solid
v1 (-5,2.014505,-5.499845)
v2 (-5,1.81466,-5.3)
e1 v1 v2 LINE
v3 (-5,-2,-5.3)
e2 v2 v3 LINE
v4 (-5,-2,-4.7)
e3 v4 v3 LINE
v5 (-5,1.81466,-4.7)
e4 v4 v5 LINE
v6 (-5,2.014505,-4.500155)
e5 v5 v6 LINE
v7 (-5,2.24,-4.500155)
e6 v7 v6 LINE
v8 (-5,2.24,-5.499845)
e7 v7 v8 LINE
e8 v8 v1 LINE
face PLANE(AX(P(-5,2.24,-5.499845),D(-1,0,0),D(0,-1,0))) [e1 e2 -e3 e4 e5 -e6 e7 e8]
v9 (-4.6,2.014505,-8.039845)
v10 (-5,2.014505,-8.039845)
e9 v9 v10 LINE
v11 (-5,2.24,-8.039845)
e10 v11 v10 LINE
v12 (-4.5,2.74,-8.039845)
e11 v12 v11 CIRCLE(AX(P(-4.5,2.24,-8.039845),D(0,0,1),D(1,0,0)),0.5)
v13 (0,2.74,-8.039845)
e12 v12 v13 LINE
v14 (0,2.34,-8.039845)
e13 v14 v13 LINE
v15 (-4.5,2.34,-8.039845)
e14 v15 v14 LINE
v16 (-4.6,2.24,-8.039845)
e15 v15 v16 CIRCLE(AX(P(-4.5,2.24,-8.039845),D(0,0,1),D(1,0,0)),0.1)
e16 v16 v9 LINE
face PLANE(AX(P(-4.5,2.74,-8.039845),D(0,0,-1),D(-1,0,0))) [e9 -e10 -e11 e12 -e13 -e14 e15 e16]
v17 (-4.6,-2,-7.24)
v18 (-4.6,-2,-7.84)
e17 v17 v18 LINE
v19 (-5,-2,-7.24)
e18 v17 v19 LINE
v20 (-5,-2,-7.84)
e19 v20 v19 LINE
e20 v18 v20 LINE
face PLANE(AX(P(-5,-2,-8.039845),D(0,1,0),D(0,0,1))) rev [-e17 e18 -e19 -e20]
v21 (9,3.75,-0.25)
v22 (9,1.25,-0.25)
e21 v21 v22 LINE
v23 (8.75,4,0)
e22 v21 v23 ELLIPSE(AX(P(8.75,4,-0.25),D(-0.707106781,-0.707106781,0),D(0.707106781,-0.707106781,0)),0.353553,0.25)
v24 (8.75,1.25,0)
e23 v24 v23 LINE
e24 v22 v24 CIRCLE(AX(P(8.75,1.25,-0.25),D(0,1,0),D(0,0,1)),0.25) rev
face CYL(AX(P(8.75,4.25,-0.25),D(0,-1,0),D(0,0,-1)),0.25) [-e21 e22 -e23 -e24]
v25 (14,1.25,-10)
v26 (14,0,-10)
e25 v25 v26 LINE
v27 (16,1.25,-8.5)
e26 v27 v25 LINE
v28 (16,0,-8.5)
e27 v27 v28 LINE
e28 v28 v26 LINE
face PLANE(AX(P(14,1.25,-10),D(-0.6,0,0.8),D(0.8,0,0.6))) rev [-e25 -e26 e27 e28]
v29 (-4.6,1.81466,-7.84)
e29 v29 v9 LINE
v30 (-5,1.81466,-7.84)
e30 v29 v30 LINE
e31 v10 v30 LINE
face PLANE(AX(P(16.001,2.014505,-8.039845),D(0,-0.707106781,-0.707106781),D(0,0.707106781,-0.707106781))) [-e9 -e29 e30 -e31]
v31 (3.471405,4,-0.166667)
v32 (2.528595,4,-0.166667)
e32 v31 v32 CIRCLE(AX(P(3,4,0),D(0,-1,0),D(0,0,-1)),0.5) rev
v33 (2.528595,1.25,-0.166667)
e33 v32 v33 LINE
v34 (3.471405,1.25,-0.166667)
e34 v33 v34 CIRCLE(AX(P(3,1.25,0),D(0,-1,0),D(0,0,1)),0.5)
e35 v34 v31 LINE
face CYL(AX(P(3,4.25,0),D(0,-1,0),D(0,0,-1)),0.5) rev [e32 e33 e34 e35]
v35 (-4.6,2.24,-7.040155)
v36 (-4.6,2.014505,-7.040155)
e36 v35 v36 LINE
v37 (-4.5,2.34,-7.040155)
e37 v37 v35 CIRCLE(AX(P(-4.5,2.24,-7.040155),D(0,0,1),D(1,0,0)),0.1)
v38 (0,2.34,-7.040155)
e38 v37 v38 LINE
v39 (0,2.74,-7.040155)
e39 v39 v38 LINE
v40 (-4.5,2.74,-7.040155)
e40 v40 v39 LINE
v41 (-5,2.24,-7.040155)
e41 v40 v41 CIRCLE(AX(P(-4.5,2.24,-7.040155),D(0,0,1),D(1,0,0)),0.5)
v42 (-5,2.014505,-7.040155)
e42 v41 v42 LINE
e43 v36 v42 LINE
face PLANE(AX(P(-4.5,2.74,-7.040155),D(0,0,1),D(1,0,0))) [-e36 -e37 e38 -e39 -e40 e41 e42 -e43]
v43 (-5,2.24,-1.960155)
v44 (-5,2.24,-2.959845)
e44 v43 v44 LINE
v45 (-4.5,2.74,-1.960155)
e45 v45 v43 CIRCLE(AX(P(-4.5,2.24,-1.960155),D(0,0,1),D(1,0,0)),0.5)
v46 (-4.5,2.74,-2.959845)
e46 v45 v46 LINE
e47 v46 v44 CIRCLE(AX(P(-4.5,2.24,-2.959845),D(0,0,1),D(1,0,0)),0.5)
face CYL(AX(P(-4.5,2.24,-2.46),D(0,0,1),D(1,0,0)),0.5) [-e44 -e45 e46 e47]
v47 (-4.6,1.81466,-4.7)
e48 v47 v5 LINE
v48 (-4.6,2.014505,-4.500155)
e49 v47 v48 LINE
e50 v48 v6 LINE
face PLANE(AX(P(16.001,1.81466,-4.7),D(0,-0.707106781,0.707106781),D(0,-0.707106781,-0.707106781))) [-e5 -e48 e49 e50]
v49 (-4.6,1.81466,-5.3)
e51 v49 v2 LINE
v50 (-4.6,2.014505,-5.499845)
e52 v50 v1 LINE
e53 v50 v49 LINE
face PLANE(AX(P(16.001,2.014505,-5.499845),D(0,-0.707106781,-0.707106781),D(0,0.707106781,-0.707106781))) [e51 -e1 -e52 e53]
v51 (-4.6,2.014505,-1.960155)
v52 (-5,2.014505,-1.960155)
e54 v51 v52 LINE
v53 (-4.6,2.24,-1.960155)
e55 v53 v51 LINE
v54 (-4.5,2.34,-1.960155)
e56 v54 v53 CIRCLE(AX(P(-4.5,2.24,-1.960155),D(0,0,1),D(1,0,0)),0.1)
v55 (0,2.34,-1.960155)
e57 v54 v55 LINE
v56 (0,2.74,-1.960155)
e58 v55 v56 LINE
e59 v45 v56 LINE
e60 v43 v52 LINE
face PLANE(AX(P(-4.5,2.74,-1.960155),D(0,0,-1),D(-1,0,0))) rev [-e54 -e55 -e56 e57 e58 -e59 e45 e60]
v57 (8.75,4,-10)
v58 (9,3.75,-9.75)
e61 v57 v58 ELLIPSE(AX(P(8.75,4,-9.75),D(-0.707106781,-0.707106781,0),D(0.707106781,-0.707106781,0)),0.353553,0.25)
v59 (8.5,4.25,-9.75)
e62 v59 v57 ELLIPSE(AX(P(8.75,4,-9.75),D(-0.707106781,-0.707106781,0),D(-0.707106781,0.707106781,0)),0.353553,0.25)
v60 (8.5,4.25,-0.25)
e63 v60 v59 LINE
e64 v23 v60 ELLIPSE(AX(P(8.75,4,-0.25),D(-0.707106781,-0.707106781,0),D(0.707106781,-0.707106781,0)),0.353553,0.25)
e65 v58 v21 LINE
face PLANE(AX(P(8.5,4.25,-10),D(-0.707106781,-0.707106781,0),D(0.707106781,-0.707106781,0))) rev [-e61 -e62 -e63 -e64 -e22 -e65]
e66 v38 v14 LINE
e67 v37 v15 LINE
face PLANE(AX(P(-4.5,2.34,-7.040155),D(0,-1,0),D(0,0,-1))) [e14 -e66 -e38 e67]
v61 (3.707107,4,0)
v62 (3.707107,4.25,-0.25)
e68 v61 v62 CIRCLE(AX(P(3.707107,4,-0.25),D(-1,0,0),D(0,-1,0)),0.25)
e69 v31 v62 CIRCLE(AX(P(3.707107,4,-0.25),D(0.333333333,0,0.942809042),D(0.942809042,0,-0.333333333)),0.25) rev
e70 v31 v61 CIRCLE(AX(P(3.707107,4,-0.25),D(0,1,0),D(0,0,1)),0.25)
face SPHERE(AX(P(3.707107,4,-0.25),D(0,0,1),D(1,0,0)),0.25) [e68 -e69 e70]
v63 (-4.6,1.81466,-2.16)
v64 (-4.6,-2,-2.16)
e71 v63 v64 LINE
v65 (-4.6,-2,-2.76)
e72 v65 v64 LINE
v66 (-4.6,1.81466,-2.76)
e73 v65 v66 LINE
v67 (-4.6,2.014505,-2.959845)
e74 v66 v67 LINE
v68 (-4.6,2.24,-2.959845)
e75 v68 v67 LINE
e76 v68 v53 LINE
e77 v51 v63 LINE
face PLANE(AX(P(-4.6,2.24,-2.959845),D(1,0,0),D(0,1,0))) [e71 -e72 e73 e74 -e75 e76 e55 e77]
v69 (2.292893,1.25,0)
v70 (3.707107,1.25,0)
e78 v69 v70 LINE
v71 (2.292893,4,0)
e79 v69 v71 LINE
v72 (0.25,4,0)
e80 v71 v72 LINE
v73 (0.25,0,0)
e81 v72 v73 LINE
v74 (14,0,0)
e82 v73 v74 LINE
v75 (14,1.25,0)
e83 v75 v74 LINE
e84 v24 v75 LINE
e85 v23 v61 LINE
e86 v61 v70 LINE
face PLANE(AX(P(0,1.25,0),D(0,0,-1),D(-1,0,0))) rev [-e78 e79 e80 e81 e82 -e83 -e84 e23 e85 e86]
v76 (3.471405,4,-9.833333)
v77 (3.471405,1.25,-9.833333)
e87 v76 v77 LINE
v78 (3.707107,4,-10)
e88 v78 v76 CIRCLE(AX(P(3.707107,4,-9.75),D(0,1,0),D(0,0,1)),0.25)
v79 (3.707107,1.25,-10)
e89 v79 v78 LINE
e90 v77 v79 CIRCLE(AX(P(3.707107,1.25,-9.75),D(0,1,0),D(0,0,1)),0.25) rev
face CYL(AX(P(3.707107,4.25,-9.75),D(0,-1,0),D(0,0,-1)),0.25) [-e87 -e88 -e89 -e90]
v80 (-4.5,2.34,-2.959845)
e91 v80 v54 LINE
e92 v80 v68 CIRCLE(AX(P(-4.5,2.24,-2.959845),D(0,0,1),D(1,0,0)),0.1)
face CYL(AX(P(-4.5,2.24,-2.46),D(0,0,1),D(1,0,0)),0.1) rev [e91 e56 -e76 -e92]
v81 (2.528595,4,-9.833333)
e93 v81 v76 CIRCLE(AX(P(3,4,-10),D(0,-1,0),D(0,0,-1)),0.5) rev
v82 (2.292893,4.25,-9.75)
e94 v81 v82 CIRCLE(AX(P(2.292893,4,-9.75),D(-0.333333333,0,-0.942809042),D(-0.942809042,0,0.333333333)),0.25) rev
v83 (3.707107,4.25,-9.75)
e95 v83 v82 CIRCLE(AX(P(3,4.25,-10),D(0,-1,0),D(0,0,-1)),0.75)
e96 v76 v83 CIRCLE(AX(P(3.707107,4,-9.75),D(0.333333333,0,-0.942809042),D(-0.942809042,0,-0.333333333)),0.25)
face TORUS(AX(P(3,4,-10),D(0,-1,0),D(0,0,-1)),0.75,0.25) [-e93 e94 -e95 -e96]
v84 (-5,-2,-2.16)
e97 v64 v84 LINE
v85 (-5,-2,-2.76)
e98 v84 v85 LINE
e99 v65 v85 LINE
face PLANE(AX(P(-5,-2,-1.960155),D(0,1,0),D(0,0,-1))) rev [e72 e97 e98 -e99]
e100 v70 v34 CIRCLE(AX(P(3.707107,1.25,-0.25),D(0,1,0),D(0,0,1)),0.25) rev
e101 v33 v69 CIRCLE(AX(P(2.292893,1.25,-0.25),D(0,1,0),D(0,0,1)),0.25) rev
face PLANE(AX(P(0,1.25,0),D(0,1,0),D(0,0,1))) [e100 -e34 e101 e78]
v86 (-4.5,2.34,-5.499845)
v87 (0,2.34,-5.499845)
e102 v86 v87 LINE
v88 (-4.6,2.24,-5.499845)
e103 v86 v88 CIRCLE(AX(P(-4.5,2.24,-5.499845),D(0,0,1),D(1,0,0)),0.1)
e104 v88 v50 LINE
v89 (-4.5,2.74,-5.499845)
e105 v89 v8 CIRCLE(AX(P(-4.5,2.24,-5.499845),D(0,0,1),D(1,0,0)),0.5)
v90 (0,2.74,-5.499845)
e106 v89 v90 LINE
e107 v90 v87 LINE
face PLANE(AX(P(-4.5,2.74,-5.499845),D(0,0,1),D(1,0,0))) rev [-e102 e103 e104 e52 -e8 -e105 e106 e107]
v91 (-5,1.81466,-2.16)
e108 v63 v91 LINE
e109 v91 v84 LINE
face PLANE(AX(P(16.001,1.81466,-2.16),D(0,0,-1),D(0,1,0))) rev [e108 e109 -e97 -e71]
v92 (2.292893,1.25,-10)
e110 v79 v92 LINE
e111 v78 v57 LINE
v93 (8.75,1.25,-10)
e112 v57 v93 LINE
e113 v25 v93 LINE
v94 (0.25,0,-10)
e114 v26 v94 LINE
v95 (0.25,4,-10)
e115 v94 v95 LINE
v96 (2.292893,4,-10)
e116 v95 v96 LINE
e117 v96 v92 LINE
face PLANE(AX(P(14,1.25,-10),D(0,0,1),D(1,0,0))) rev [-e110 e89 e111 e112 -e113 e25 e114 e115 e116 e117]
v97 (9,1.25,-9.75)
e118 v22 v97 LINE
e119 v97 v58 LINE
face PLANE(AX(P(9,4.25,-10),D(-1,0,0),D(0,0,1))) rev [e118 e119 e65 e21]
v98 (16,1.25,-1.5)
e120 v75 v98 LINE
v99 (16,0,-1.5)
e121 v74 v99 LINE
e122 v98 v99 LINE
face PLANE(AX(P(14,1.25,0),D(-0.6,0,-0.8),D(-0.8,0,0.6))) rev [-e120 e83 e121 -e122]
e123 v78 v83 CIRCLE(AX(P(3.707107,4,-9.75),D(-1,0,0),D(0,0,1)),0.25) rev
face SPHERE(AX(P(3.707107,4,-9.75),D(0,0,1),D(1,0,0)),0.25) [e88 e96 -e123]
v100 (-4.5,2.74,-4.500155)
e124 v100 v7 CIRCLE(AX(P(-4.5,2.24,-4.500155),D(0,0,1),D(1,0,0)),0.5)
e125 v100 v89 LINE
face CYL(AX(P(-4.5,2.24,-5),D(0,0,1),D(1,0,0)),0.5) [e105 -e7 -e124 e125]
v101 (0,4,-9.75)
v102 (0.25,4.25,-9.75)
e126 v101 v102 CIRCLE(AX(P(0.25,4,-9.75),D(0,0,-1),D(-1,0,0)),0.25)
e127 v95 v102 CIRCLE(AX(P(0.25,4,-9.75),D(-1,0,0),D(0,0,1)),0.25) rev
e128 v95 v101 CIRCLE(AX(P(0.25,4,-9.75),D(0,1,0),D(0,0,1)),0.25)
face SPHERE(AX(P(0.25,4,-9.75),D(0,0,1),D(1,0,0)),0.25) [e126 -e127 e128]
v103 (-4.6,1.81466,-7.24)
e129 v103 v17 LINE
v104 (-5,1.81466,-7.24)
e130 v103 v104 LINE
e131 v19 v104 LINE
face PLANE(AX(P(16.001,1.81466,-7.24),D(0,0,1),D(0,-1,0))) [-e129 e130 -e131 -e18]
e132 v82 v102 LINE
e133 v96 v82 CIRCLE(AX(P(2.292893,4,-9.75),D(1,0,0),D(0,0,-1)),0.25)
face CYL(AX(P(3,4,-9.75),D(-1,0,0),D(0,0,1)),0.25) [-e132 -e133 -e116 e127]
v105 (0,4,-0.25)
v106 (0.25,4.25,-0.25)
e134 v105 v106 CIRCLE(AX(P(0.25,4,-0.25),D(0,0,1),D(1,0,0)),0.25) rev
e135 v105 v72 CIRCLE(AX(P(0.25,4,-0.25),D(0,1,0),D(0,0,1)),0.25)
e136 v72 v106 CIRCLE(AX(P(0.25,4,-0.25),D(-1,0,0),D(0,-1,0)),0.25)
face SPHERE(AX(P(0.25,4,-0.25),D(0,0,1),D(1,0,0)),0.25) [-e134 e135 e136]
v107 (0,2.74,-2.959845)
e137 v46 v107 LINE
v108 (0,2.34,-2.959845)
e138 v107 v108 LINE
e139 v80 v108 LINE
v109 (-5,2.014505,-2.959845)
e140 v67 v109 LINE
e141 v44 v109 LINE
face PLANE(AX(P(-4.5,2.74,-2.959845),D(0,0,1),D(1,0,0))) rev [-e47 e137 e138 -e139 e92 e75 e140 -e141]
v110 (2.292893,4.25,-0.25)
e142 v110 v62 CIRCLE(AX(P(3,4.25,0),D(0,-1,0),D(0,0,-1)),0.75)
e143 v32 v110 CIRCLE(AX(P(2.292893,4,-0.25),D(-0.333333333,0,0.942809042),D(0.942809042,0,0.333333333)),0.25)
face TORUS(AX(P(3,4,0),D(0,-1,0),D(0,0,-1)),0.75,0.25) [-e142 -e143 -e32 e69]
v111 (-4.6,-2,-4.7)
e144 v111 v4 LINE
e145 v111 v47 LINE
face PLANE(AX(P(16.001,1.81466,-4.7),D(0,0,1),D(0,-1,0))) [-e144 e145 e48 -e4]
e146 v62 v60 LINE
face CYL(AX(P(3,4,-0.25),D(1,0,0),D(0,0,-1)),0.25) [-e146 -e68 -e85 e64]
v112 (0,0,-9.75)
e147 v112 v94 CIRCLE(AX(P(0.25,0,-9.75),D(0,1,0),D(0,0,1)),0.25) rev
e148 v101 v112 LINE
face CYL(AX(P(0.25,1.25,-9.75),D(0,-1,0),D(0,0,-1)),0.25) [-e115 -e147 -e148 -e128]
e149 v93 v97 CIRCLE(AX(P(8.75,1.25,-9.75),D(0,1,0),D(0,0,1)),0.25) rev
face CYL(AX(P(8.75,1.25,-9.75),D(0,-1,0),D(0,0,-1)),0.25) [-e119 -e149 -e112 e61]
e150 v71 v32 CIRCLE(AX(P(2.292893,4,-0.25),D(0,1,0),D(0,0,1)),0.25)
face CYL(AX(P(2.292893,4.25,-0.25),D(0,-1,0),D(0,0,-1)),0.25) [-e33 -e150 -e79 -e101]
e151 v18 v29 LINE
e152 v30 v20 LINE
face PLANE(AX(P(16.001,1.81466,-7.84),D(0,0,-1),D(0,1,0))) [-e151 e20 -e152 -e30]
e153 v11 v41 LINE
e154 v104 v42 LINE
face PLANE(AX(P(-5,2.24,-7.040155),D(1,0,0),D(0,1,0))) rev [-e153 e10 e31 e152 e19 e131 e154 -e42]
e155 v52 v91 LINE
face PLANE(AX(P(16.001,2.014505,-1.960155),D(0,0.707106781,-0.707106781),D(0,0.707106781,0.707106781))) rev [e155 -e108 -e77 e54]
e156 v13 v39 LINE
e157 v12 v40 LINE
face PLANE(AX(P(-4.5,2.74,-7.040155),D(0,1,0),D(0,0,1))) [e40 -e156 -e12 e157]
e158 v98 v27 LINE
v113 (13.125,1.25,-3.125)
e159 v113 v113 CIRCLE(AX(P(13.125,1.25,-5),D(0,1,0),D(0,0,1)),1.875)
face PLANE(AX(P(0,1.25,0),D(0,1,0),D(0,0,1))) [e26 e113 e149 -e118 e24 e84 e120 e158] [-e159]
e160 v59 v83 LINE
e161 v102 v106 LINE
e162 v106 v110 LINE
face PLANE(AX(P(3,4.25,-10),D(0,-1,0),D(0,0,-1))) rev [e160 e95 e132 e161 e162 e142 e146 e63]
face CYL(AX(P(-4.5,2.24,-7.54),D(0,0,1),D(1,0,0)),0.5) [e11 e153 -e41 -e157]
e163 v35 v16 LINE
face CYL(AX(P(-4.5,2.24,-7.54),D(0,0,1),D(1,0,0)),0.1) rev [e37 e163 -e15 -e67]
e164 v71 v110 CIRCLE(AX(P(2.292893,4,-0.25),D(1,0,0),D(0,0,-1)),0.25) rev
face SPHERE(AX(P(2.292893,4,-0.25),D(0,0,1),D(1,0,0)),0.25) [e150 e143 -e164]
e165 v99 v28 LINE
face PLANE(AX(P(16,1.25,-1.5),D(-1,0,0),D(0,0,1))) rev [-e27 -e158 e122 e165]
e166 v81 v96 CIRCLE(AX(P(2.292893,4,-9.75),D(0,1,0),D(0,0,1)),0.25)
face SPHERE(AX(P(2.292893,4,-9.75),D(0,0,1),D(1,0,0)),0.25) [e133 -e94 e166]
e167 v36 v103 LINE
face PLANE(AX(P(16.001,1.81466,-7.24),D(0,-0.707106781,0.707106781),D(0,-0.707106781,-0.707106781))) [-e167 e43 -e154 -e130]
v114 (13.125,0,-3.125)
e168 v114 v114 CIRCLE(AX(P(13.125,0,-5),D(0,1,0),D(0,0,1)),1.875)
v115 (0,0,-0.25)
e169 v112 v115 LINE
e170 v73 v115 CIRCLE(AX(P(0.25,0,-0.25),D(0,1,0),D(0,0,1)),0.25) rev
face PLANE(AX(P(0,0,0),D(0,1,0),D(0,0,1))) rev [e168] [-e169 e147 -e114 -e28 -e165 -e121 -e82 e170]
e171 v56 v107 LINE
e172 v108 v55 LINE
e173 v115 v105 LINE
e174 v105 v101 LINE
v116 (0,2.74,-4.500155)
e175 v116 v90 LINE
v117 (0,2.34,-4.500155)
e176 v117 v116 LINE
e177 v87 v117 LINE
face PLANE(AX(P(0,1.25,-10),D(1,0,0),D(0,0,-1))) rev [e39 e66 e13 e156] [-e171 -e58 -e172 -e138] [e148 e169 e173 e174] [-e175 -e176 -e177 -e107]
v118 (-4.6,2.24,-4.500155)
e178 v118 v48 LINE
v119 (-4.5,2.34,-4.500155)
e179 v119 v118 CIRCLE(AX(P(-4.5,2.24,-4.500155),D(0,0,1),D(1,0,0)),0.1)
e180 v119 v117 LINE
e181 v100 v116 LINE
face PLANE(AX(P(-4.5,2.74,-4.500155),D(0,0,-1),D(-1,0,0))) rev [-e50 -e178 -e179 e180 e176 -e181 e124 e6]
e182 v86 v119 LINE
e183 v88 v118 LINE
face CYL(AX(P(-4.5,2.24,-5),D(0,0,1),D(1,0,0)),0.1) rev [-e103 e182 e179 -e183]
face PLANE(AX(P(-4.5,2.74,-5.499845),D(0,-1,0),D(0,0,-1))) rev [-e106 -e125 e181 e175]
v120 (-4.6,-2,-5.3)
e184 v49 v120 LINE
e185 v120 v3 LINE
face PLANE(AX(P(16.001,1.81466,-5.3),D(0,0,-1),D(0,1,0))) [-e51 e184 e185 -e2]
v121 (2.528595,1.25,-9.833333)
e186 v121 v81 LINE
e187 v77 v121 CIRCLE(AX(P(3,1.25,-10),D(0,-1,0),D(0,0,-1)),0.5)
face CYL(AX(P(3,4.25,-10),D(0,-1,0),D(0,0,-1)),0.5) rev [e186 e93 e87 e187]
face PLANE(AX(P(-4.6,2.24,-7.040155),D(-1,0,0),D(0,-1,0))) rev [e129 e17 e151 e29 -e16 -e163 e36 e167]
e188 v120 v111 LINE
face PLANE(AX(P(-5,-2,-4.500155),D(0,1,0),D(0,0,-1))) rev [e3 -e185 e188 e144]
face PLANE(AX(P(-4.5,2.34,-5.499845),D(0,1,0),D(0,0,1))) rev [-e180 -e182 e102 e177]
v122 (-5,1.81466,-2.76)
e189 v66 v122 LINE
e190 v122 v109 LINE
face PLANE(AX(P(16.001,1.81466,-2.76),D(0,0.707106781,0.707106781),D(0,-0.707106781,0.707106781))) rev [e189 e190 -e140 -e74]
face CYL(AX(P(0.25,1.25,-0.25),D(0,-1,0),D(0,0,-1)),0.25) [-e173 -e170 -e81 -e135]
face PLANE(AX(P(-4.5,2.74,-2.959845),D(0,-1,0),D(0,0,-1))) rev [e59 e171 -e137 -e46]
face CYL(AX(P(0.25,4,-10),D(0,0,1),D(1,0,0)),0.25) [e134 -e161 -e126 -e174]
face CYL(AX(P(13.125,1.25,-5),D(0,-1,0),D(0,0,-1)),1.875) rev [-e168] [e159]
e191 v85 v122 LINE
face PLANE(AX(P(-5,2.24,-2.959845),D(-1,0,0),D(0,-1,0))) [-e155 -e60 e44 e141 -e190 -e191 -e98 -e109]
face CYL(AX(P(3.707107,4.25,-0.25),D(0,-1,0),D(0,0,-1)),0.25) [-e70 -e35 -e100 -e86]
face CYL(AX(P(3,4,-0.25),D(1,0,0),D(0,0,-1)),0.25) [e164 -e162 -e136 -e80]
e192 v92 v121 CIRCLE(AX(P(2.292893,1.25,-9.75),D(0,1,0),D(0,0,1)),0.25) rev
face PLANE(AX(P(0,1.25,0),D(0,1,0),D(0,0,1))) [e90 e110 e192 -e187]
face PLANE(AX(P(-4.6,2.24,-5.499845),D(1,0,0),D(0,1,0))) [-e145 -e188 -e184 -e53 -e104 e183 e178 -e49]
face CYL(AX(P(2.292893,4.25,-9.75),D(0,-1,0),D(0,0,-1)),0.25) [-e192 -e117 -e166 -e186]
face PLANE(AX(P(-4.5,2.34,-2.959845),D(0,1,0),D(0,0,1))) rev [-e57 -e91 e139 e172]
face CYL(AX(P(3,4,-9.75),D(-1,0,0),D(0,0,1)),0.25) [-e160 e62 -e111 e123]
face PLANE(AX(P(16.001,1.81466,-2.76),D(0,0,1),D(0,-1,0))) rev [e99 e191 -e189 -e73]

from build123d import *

# Parameters (mm, degrees)
SKETCH_1_R               = 1.875
EXTRUDE_1_DEPTH          = 1.25
EXTRUDE_2_DEPTH          = 3
FILLET_1_R               = 0.25
CHAMFER_1_SIZE           = 0.5
SKETCH_3_W               = 0.999690432
SKETCH_3_H               = 0.4
CUT_EXTRUDE_1_REACH      = 25.645
PATTERN_LINEAR_1_COUNT   = 2
PATTERN_LINEAR_1_PITCH   = 2.54
MIRROR_1_COPY_1_SKETCH_W = 0.999690432
MIRROR_1_COPY_1_SKETCH_H = 0.4
MIRROR_1_COPY_2_REACH    = 25.645


with BuildPart() as part:
    # 草图1 → 凸台-拉伸1 (new body)
    with BuildSketch(Plane(origin=(0, 0, 0), x_dir=(1, 0, 0), z_dir=(0, 1, 0))):
        Polygon((0, 0), (14, 0), (16, 1.5), (16, 8.5), (14, 10), (0, 10), align=None)
        with Locations(Location((13.125, 5, 0), (0, 0, 270))):
            Circle(SKETCH_1_R, mode=Mode.SUBTRACT)
    extrude(amount=EXTRUDE_1_DEPTH)

    # 草图2 → 凸台-拉伸2 (add)
    with BuildSketch(Plane(origin=(0, 1.25, 0), x_dir=(1, 0, 0), z_dir=(0, 1, 0))):
        with BuildLine():
            Line((0, 10), (2.5, 10))
            ThreePointArc((2.5, 10), (3, 9.5), (3.5, 10))
            Line((3.5, 10), (9, 10))
            Line((9, 10), (9, 0))
            Line((9, 0), (3.5, 0))
            ThreePointArc((3.5, 0), (3, 0.5), (2.5, 0))
            Line((2.5, 0), (0, 0))
            Line((0, 0), (0, 10))
        make_face()
    extrude(amount=EXTRUDE_2_DEPTH)

    # 圆角1
    fillet_1_edges = [part.edges().sort_by_distance(p)[0] for p in [
        (0, 2.125, -10),
        (2.5, 2.75, -10),
        (3.5, 2.75, -10),
        (6.25, 4.25, -10),
        (3, 4.25, -9.5),
        (1.25, 4.25, -10),
        (0, 4.25, -5),
        (0, 2.125, 0),
        (3.5, 2.75, 0),
        (2.5, 2.75, 0),
        (1.25, 4.25, 0),
        (3, 4.25, -0.5),
        (6.25, 4.25, 0),
        (9, 2.75, -10),
        (9, 2.75, 0),
    ]]
    fillet(fillet_1_edges, radius=FILLET_1_R)

    # 倒角1
    # the kernel refuses this chamfer: 0.5 mm, written as the material it takes off along each edge
    with BuildSketch(Plane(origin=(9, 4.25, -11.035841494), x_dir=(-0.9996219169112968, 0.027495876610585647, 0), z_dir=(0, 0, 1))) as chamfer_1_piece_1:
        Polygon((CHAMFER_1_SIZE * 0.999621916911, CHAMFER_1_SIZE * 0.0274958766106), (-CHAMFER_1_SIZE * 0.0274958766106, CHAMFER_1_SIZE * 0.999621916911), (0, 0), align=None)
    extrude(amount=12.071682988, mode=Mode.SUBTRACT)

    # 扫描1: sweep along a path in 草图4
    with BuildLine(Plane(origin=(0, 0, -5), x_dir=(-1, 0, 0), z_dir=(0, 0, -1))) as sweep_1_path:
        Line((0, 2.74), (4.5, 2.74))
        ThreePointArc((4.5, 2.74), (4.853553391, 2.593553391), (5, 2.24))
        Line((5, 2.24), (5, -2))
    # 草图3 → 扫描1 (sweep)
    with BuildSketch(Plane.ZY):
        with Locations((-5, 2.54)):
            Rectangle(SKETCH_3_W, SKETCH_3_H)
    sweep_1 = sweep(path=sweep_1_path.line)

    # 草图5 → 切除-拉伸1 (cut, up to next)
    with BuildSketch(Plane.ZY.offset(5), mode=Mode.PRIVATE) as cut_extrude_1_sk1:
        Polygon((-4.7, 1.814659855), (-4.7, -2), (-4.500154784, -2), (-4.500154784, 2.014505072), align=None)
    cut_extrude_1_tool1 = extrude(cut_extrude_1_sk1.sketch, amount=-CUT_EXTRUDE_1_REACH, mode=Mode.PRIVATE) & part.part
    # 草图5 → 切除-拉伸1 (cut, up to next)
    with BuildSketch(Plane.ZY.offset(5), mode=Mode.PRIVATE) as cut_extrude_1_sk2:
        Polygon((-5.3, 1.814659855), (-5.3, -2), (-5.499845216, -2), (-5.499845216, 2.014505072), align=None)
    cut_extrude_1_tool2 = extrude(cut_extrude_1_sk2.sketch, amount=-CUT_EXTRUDE_1_REACH, mode=Mode.PRIVATE) & part.part
    cut_extrude_1_1 = cut_extrude_1_tool1.solids().sort_by_distance((-5, -0.042284, -4.599227))[0]
    add(cut_extrude_1_1, mode=Mode.SUBTRACT)
    cut_extrude_1_2 = cut_extrude_1_tool2.solids().sort_by_distance((-5, -0.042284, -5.400773))[0]
    add(cut_extrude_1_2, mode=Mode.SUBTRACT)
    cut_extrude_1 = cut_extrude_1_1 + cut_extrude_1_2  # 切除-拉伸1 as one shape, for the pattern or mirror that repeats it

    # 阵列(线性)1: 扫描1, 切除-拉伸1 ×2
    with Locations(*[(0, 0, i * PATTERN_LINEAR_1_PITCH) for i in range(1, PATTERN_LINEAR_1_COUNT)]):
        add(sweep_1)
        add(cut_extrude_1, mode=Mode.SUBTRACT)

    # 镜向1: 扫描1, 切除-拉伸1 across plane
    add(sweep_1.mirror(Plane(origin=(0, 0, -5), x_dir=(1, 0, 0), z_dir=(0, 0, -1))))
    add(cut_extrude_1.mirror(Plane(origin=(0, 0, -5), x_dir=(1, 0, 0), z_dir=(0, 0, -1))), mode=Mode.SUBTRACT)

    # 镜向1 copy 1: sweep along a path in 镜向1 copy 1 path
    with BuildLine(Plane(origin=(0, 0, -7.54), x_dir=(-1, 0, 0), z_dir=(0, 0, 1))) as mirror_1_copy_1_path:
        Line((0, -2.74), (4.5, -2.74))
        ThreePointArc((4.5, -2.74), (4.853553391, -2.593553391), (5, -2.24))
        Line((5, -2.24), (5, 2))
    # 镜向1 copy 1 sketch → 镜向1 copy 1 (sweep)
    with BuildSketch(Plane(origin=(0, 0, -12.54), x_dir=(0, 0, -1), z_dir=(-1, 0, 0))):
        with Locations((-5, -2.54)):
            Rectangle(MIRROR_1_COPY_1_SKETCH_W, MIRROR_1_COPY_1_SKETCH_H)
    sweep(path=mirror_1_copy_1_path.line)

    # 镜向1 copy 2 sketch → 镜向1 copy 2 (cut, up to next)
    with BuildSketch(Plane(origin=(-5, 0, -12.54), x_dir=(0, 0, -1), z_dir=(-1, 0, 0)), mode=Mode.PRIVATE) as mirror_1_copy_2_sk1:
        Polygon((-4.7, -1.814659855), (-4.7, 2), (-4.500154784, 2), (-4.500154784, -2.014505072), align=None)
    mirror_1_copy_2_tool1 = extrude(mirror_1_copy_2_sk1.sketch, amount=-MIRROR_1_COPY_2_REACH, mode=Mode.PRIVATE) & part.part
    # 镜向1 copy 2 sketch → 镜向1 copy 2 (cut, up to next)
    with BuildSketch(Plane(origin=(-5, 0, -12.54), x_dir=(0, 0, -1), z_dir=(-1, 0, 0)), mode=Mode.PRIVATE) as mirror_1_copy_2_sk2:
        Polygon((-5.3, -1.814659855), (-5.3, 2), (-5.499845216, 2), (-5.499845216, -2.014505072), align=None)
    mirror_1_copy_2_tool2 = extrude(mirror_1_copy_2_sk2.sketch, amount=-MIRROR_1_COPY_2_REACH, mode=Mode.PRIVATE) & part.part
    add(mirror_1_copy_2_tool1.solids().sort_by_distance((-5, -0.042284, -7.940773))[0], mode=Mode.SUBTRACT)
    add(mirror_1_copy_2_tool2.solids().sort_by_distance((-5, -0.042284, -7.139227))[0], mode=Mode.SUBTRACT)


solid = part.part
